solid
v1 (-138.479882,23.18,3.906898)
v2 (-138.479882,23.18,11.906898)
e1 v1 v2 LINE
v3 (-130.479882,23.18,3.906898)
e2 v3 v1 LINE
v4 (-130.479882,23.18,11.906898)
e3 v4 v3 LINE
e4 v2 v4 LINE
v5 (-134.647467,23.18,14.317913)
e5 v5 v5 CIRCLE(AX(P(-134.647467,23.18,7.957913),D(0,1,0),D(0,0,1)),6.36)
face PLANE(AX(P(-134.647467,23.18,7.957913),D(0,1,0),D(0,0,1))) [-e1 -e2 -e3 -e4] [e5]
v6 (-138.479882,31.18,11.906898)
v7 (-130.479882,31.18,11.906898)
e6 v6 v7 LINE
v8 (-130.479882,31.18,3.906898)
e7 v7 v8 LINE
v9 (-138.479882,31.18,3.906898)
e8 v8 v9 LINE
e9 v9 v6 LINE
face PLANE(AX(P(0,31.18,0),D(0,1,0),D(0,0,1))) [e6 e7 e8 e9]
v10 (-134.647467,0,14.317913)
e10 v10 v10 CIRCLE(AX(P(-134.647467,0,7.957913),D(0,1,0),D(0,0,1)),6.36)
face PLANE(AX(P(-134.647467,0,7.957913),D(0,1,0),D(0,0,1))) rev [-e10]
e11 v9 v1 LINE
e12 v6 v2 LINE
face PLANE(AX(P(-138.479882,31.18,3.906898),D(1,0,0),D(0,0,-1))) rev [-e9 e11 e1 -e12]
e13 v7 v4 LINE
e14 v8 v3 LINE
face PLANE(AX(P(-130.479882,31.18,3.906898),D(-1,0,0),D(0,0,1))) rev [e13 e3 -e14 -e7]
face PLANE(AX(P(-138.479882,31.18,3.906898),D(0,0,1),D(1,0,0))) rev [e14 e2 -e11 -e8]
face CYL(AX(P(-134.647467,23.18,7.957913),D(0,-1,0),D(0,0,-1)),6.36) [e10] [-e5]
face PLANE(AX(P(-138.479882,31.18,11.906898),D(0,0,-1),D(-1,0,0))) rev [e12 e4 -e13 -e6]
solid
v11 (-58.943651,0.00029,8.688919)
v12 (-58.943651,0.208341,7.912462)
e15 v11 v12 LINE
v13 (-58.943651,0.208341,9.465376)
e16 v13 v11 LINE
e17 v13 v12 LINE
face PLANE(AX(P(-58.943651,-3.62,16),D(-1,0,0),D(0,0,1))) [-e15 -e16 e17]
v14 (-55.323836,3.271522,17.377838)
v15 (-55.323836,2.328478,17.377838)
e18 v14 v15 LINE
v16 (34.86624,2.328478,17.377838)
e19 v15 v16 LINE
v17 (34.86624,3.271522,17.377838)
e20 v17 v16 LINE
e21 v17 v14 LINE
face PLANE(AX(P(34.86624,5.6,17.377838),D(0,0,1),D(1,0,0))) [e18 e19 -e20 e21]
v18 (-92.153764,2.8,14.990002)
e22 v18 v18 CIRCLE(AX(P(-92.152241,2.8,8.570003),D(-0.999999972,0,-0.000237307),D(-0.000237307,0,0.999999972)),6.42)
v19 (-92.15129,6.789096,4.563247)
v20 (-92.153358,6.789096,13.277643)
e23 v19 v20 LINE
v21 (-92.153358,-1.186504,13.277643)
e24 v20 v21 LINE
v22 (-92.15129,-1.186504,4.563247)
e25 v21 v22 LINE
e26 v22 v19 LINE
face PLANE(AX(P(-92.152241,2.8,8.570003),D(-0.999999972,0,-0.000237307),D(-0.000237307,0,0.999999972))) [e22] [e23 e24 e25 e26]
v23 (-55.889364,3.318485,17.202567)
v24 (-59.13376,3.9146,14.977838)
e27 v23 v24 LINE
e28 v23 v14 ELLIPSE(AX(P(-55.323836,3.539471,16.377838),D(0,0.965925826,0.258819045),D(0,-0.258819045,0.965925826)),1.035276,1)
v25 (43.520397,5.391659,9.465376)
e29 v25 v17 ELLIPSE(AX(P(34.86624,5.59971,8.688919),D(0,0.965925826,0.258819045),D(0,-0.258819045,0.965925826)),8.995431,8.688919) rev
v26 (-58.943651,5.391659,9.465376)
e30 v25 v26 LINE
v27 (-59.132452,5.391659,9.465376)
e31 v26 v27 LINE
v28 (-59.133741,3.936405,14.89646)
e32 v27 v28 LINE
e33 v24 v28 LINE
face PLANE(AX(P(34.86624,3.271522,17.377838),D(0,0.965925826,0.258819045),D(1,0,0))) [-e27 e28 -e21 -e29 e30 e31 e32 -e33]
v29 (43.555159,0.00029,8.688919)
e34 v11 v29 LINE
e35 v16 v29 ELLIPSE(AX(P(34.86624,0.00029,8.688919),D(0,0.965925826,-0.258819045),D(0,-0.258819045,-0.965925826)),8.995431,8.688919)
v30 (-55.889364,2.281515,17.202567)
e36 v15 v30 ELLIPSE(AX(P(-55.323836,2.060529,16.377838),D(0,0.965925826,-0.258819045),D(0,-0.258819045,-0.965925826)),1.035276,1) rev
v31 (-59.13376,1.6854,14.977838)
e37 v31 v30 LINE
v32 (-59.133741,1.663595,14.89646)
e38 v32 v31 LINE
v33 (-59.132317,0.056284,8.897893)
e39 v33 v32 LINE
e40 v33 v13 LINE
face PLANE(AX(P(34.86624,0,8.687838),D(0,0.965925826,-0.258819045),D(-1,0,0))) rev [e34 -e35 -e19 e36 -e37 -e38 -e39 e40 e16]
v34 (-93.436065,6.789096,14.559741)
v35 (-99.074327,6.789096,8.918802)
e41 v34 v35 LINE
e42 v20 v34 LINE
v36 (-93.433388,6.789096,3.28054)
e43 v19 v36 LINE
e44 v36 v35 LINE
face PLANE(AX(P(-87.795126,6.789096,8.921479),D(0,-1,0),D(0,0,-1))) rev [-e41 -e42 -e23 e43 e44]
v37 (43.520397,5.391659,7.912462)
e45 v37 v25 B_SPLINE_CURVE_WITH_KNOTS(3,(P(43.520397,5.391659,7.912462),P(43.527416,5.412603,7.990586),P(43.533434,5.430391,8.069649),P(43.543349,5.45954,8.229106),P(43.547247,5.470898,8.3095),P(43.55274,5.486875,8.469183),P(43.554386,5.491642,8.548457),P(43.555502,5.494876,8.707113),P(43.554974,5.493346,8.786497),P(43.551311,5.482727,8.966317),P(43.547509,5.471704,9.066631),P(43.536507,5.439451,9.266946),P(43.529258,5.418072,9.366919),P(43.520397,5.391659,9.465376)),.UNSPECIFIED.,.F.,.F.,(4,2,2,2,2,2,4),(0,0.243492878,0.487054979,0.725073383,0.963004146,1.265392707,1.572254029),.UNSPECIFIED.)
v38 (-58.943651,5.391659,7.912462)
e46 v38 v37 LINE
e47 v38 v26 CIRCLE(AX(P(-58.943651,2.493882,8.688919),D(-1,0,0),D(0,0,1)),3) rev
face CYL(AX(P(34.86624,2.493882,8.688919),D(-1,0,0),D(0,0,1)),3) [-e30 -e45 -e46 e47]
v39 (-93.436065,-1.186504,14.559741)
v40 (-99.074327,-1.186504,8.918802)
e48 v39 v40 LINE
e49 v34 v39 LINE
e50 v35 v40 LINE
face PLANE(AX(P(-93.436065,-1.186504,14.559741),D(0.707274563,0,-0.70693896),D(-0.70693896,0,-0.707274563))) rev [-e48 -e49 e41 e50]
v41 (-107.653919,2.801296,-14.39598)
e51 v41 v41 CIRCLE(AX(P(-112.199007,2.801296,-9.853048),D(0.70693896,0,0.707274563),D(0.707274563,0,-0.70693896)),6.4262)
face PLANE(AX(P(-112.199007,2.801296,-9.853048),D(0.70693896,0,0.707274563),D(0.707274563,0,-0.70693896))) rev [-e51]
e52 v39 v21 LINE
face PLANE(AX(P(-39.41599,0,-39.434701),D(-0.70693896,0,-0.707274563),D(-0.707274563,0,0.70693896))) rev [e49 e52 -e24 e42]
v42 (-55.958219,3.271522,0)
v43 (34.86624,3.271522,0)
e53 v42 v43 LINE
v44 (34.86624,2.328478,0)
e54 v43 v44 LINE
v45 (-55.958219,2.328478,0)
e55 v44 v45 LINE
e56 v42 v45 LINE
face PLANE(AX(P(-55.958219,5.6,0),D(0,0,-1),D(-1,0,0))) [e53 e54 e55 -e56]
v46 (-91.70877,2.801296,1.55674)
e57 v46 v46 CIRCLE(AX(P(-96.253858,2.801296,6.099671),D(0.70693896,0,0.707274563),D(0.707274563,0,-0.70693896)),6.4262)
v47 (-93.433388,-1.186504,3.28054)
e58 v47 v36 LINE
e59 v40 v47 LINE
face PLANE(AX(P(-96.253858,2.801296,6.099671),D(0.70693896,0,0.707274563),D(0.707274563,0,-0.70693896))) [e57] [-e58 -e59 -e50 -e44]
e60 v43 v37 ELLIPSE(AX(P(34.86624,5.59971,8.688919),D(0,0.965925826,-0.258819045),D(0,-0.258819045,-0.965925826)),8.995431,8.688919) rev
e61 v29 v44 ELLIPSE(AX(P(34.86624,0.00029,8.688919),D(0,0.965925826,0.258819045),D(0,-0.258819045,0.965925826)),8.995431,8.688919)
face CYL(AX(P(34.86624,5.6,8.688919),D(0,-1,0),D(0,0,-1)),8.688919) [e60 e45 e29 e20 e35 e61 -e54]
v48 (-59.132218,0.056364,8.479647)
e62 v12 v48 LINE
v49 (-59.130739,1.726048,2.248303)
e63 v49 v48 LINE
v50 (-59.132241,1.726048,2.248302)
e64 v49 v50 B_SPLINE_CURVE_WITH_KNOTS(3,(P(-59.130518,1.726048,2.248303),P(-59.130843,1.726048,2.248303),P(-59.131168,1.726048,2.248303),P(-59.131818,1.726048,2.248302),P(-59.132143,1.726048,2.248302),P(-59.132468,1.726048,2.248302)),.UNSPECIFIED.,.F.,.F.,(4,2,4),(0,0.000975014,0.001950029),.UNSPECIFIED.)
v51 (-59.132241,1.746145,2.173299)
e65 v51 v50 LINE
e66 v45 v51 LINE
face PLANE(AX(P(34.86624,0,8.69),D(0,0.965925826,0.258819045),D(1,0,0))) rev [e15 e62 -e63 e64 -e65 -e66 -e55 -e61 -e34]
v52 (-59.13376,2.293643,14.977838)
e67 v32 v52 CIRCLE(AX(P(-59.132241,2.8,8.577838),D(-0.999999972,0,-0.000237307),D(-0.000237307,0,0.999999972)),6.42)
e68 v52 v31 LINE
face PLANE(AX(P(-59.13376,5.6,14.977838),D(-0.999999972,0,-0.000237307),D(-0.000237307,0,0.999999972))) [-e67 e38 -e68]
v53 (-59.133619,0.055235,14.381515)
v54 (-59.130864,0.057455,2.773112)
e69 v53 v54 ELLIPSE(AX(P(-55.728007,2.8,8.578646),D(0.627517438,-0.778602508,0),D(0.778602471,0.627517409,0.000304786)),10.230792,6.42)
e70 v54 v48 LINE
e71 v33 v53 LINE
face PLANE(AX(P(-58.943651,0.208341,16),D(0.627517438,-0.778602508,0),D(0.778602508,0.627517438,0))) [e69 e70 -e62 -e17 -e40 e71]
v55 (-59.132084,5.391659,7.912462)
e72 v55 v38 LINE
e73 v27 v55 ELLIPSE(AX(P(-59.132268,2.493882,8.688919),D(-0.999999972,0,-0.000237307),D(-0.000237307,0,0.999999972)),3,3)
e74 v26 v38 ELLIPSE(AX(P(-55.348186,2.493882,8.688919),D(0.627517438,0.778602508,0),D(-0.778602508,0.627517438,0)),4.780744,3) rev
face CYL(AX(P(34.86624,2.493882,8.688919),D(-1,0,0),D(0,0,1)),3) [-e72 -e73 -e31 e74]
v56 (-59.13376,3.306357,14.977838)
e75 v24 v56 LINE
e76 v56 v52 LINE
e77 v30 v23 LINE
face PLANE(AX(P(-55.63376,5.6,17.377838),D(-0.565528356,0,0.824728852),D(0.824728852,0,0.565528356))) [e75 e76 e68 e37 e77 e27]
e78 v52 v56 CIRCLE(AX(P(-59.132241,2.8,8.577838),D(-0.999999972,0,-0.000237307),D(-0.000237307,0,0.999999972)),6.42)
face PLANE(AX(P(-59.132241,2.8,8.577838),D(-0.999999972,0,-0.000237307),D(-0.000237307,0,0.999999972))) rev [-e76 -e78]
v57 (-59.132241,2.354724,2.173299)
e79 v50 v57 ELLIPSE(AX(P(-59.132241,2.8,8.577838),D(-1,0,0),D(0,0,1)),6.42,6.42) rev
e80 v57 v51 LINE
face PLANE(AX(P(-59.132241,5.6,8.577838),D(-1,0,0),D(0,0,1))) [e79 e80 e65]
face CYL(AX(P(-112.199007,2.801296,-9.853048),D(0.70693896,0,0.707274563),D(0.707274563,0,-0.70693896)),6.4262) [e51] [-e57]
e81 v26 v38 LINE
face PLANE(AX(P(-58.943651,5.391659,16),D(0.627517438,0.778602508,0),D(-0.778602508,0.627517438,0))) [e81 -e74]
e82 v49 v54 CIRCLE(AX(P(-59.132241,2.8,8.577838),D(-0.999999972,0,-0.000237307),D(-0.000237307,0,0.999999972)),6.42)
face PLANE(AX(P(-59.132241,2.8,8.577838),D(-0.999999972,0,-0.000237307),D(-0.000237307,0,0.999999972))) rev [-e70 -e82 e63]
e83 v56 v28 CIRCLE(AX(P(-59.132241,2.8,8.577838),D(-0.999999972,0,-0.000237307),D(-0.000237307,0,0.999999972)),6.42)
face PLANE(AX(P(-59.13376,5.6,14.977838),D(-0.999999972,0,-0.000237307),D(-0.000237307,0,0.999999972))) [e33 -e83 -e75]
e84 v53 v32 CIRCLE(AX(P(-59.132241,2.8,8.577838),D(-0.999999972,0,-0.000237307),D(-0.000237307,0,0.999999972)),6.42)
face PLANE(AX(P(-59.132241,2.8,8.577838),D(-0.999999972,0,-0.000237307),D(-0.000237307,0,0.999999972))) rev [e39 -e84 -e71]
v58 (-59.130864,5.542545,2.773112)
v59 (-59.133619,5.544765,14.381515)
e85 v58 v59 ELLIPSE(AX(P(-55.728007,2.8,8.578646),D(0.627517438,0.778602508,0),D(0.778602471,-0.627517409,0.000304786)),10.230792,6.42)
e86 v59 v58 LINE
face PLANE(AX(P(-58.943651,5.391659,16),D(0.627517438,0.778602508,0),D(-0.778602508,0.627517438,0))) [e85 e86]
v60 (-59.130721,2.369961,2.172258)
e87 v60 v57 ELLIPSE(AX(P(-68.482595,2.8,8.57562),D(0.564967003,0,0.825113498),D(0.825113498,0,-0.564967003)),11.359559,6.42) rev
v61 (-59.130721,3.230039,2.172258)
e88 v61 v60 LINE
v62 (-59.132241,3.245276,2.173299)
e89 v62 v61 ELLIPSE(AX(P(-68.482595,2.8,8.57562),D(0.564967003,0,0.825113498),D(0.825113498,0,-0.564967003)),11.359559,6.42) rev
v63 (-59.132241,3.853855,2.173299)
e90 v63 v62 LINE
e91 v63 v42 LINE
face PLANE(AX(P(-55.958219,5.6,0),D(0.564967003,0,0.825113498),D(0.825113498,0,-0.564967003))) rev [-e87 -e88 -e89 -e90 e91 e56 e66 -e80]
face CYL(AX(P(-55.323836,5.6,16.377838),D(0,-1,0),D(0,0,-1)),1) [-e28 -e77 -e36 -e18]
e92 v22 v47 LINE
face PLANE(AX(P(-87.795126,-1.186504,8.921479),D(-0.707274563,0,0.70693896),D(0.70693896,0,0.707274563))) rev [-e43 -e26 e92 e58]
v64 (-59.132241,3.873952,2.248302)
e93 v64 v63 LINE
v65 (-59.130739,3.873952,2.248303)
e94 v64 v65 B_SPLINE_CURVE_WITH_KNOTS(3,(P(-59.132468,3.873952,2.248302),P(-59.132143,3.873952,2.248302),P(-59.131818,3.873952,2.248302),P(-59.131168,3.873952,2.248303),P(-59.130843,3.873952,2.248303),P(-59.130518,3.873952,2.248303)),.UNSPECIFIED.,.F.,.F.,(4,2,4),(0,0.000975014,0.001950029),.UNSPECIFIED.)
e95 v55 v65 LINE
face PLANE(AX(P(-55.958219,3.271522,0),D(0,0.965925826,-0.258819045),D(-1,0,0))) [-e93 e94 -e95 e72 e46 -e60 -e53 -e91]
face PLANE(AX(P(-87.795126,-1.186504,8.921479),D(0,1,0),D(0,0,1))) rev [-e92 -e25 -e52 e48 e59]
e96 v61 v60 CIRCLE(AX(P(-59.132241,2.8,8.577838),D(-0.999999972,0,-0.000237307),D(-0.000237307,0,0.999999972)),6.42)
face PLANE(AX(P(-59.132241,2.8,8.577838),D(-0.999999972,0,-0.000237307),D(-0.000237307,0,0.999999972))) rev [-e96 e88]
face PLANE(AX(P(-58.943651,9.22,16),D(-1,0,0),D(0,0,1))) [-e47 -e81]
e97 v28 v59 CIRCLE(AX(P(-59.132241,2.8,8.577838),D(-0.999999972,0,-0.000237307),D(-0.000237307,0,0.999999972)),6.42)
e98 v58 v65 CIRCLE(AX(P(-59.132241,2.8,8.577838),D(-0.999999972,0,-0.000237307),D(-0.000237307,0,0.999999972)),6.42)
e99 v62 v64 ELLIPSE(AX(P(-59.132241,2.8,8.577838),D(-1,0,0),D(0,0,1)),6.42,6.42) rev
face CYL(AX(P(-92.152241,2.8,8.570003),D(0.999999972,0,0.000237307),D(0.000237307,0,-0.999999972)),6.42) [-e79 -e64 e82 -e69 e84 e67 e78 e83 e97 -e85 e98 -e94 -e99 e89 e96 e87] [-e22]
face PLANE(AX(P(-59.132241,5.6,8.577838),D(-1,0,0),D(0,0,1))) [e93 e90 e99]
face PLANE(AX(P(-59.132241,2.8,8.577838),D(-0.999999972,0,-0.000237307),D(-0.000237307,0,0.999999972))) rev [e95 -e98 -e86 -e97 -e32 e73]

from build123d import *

# Parameters (mm, degrees)
BOSS_EXTRUDE2_DEPTH = 5.6
CHAMFER2_SIZE       = 2.328478482
CHAMFER2_SIZE_2     = 8.69
CHAMFER3_SIZE       = 8.69
CHAMFER3_SIZE_2     = 2.328478482
CHAMFER4_SIZE       = 8.69
CHAMFER4_SIZE_2     = 2.328478482
CHAMFER5_SIZE       = 8.69
CHAMFER5_SIZE_2     = 2.328478482
FILLET1_R           = 1
SKETCH8_R           = 6.42
BOSS_EXTRUDE3_DEPTH = 33.02
FILLET2_R           = 3
CUT_EXTRUDE12_DEPTH = 16
SKETCH21_R          = 6.36
BOSS_EXTRUDE4_DEPTH = 23.18
SKETCH22_W          = 8
SKETCH22_H          = 8
BOSS_EXTRUDE5_DEPTH = 8
SKETCH26_R          = 6.4262
BOSS_EXTRUDE6_DEPTH = 22.5552
SKETCH27_W          = 7.9756
SKETCH27_H          = 7.9756
BOSS_EXTRUDE7_DEPTH = 7.9756


with BuildPart() as part:
    # Sketch3 → Boss-Extrude2 (new body)
    with BuildSketch(Plane(origin=(0, 0, 0), x_dir=(1, 0, 0), z_dir=(0, 1, 0))):
        with BuildLine():
            Line((-55.958218902, 0), (34.866239796, 0))
            ThreePointArc((34.866239796, 0), (43.555159042, -8.688919246), (34.866239796, -17.377838493))
            Line((34.866239796, -17.377838493), (-55.633760204, -17.377838493))
            Line((-55.633760204, -17.377838493), (-59.133760204, -14.977838493))
            Line((-59.133760204, -14.977838493), (-59.132241437, -8.577838493))
            Line((-59.132241437, -8.577838493), (-59.132241437, -2.173298587))
            Line((-59.132241437, -2.173298587), (-55.958218902, 0))
        make_face()
    extrude(amount=BOSS_EXTRUDE2_DEPTH)

    # Chamfer2
    # the kernel refuses this chamfer: 8.69, 2.328478482 mm, written as the material it takes off along each edge
    with BuildSketch(Plane(origin=(57.431750241, 5.6, 17.377838493), x_dir=(0, -0.9905000388259545, 0.13751244702128881), z_dir=(-1, 0, 0))) as chamfer2_piece_1:
        Polygon((CHAMFER2_SIZE * 0.990500038922, -CHAMFER2_SIZE * 0.137512447035), (-CHAMFER2_SIZE_2 * 0.137512447021, -CHAMFER2_SIZE_2 * 0.990500038826), (0, 0), align=None)
    extrude(amount=135.63102089, mode=Mode.SUBTRACT)

    # Chamfer3
    # the kernel refuses this chamfer: 8.69, 2.328478482 mm, written as the material it takes off along each edge
    with BuildSketch(Plane(origin=(57.431750241, 0, 17.377838493), x_dir=(0, -0.009967146577156423, -0.9999503267608394), z_dir=(-1, 0, 0))) as chamfer3_piece_1:
        Polygon((CHAMFER3_SIZE * 0.999950326761, -CHAMFER3_SIZE * 0.00996714657716), (-CHAMFER3_SIZE_2 * 0.00996714657813, -CHAMFER3_SIZE_2 * 0.999950326858), (0, 0), align=None)
    extrude(amount=135.63102089, mode=Mode.SUBTRACT)

    # Chamfer4
    # the kernel refuses this chamfer: 8.69, 2.328478482 mm, written as the material it takes off along each edge
    with BuildSketch(Plane(origin=(-78.523729347, 5.6, 0), x_dir=(0, 0.00996714657715643, 0.9999503267608394), z_dir=(1, 0, 0))) as chamfer4_piece_1:
        Polygon((CHAMFER4_SIZE * 0.999950326761, CHAMFER4_SIZE * 0.00996714657716), (-CHAMFER4_SIZE_2 * 0.00996714657813, CHAMFER4_SIZE_2 * 0.999950326858), (0, 0), align=None)
    extrude(amount=135.955479588, mode=Mode.SUBTRACT)

    # Chamfer5
    # the kernel refuses this chamfer: 8.69, 2.328478482 mm, written as the material it takes off along each edge
    with BuildSketch(Plane(origin=(-78.523729347, 0, 0), x_dir=(0, -0.009967146577156423, 0.9999503267608394), z_dir=(1, 0, 0))) as chamfer5_piece_1:
        Polygon((CHAMFER5_SIZE * 0.999950326761, -CHAMFER5_SIZE * 0.00996714657716), (-CHAMFER5_SIZE_2 * 0.00996714657813, -CHAMFER5_SIZE_2 * 0.999950326858), (0, 0), align=None)
    extrude(amount=135.955479588, mode=Mode.SUBTRACT)

    # Fillet1
    fillet1_edges = [part.edges().sort_by_distance(p)[0] for p in [
        (-55.633760204, 2.8, 17.377838493),
    ]]
    fillet(fillet1_edges, radius=FILLET1_R)

    # Sketch8 → Boss-Extrude3 (add)
    with BuildSketch(Plane(origin=(-59.130202523, 0, -0.014032034), x_dir=(-0.00023730738394525297, 0, 0.9999999718426024), z_dir=(-0.9999999718426024, 0, -0.00023730738394525297))):
        with Locations(Location((8.591870769, 2.8, 0), (0, 0, 183.840787638))):
            Circle(SKETCH8_R)
    extrude(amount=BOSS_EXTRUDE3_DEPTH)

    # Fillet2
    fillet2_edges = [part.edges().sort_by_distance(p)[0] for p in [
        (-7.788554378, 5.599710413, 8.688919246),
    ]]
    fillet(fillet2_edges, radius=FILLET2_R)

    # Sketch16 → Cut-Extrude12 (cut)
    with BuildSketch(Plane.XY):
        Polygon((-58.943650552, 9.22), (-63.693726721, 9.22), (-58.943650552, 5.391659351), align=None)
        Polygon((-58.943650552, -3.62), (-63.693726721, -3.62), (-58.943650552, 0.208340649), align=None)
    extrude(amount=CUT_EXTRUDE12_DEPTH, mode=Mode.SUBTRACT)



with BuildPart() as body_2:
    # Sketch21 → Boss-Extrude4 (new body)
    with BuildSketch(Plane(origin=(0, 0, 0), x_dir=(1, 0, 0), z_dir=(0, 1, 0))):
        with Locations(Location((-134.647466818, -7.957912817, 0), (0, 0, 270))):
            Circle(SKETCH21_R)
    extrude(amount=BOSS_EXTRUDE4_DEPTH)

    # Sketch22 → Boss-Extrude5 (add)
    with BuildSketch(Plane(origin=(0, 23.18, 0), x_dir=(1, 0, 0), z_dir=(0, 1, 0))):
        with Locations((-134.479881672, -7.906897789)):
            Rectangle(SKETCH22_W, SKETCH22_H)
    extrude(amount=BOSS_EXTRUDE5_DEPTH)


with BuildPart() as body_3:
    # Sketch26 → Boss-Extrude6 (new body)
    with BuildSketch(Plane(origin=(-45.05425196, 0, -45.075640449), x_dir=(0, 1, 0), z_dir=(0.7069389596158512, 0, 0.7072745629366703))):
        with Locations(Location((2.801295813, 72.39, 0), (0, 0, 270))):
            Circle(SKETCH26_R)
    extrude(amount=-BOSS_EXTRUDE6_DEPTH)


with BuildPart() as part_1:
    add(part.part)

    add(body_3.part)  # Boss-Extrude7 merges body 3
    # Sketch27 → Boss-Extrude7 (add)
    with BuildSketch(Plane(origin=(-45.05425196, 0, -45.075640449), x_dir=(0, 1, 0), z_dir=(0.7069389596158512, 0, 0.7072745629366703))):
        with Locations((2.801295813, 72.39)):
            Rectangle(SKETCH27_W, SKETCH27_H)
    extrude(amount=BOSS_EXTRUDE7_DEPTH)


solid = Compound([body_2.part, part_1.part])
